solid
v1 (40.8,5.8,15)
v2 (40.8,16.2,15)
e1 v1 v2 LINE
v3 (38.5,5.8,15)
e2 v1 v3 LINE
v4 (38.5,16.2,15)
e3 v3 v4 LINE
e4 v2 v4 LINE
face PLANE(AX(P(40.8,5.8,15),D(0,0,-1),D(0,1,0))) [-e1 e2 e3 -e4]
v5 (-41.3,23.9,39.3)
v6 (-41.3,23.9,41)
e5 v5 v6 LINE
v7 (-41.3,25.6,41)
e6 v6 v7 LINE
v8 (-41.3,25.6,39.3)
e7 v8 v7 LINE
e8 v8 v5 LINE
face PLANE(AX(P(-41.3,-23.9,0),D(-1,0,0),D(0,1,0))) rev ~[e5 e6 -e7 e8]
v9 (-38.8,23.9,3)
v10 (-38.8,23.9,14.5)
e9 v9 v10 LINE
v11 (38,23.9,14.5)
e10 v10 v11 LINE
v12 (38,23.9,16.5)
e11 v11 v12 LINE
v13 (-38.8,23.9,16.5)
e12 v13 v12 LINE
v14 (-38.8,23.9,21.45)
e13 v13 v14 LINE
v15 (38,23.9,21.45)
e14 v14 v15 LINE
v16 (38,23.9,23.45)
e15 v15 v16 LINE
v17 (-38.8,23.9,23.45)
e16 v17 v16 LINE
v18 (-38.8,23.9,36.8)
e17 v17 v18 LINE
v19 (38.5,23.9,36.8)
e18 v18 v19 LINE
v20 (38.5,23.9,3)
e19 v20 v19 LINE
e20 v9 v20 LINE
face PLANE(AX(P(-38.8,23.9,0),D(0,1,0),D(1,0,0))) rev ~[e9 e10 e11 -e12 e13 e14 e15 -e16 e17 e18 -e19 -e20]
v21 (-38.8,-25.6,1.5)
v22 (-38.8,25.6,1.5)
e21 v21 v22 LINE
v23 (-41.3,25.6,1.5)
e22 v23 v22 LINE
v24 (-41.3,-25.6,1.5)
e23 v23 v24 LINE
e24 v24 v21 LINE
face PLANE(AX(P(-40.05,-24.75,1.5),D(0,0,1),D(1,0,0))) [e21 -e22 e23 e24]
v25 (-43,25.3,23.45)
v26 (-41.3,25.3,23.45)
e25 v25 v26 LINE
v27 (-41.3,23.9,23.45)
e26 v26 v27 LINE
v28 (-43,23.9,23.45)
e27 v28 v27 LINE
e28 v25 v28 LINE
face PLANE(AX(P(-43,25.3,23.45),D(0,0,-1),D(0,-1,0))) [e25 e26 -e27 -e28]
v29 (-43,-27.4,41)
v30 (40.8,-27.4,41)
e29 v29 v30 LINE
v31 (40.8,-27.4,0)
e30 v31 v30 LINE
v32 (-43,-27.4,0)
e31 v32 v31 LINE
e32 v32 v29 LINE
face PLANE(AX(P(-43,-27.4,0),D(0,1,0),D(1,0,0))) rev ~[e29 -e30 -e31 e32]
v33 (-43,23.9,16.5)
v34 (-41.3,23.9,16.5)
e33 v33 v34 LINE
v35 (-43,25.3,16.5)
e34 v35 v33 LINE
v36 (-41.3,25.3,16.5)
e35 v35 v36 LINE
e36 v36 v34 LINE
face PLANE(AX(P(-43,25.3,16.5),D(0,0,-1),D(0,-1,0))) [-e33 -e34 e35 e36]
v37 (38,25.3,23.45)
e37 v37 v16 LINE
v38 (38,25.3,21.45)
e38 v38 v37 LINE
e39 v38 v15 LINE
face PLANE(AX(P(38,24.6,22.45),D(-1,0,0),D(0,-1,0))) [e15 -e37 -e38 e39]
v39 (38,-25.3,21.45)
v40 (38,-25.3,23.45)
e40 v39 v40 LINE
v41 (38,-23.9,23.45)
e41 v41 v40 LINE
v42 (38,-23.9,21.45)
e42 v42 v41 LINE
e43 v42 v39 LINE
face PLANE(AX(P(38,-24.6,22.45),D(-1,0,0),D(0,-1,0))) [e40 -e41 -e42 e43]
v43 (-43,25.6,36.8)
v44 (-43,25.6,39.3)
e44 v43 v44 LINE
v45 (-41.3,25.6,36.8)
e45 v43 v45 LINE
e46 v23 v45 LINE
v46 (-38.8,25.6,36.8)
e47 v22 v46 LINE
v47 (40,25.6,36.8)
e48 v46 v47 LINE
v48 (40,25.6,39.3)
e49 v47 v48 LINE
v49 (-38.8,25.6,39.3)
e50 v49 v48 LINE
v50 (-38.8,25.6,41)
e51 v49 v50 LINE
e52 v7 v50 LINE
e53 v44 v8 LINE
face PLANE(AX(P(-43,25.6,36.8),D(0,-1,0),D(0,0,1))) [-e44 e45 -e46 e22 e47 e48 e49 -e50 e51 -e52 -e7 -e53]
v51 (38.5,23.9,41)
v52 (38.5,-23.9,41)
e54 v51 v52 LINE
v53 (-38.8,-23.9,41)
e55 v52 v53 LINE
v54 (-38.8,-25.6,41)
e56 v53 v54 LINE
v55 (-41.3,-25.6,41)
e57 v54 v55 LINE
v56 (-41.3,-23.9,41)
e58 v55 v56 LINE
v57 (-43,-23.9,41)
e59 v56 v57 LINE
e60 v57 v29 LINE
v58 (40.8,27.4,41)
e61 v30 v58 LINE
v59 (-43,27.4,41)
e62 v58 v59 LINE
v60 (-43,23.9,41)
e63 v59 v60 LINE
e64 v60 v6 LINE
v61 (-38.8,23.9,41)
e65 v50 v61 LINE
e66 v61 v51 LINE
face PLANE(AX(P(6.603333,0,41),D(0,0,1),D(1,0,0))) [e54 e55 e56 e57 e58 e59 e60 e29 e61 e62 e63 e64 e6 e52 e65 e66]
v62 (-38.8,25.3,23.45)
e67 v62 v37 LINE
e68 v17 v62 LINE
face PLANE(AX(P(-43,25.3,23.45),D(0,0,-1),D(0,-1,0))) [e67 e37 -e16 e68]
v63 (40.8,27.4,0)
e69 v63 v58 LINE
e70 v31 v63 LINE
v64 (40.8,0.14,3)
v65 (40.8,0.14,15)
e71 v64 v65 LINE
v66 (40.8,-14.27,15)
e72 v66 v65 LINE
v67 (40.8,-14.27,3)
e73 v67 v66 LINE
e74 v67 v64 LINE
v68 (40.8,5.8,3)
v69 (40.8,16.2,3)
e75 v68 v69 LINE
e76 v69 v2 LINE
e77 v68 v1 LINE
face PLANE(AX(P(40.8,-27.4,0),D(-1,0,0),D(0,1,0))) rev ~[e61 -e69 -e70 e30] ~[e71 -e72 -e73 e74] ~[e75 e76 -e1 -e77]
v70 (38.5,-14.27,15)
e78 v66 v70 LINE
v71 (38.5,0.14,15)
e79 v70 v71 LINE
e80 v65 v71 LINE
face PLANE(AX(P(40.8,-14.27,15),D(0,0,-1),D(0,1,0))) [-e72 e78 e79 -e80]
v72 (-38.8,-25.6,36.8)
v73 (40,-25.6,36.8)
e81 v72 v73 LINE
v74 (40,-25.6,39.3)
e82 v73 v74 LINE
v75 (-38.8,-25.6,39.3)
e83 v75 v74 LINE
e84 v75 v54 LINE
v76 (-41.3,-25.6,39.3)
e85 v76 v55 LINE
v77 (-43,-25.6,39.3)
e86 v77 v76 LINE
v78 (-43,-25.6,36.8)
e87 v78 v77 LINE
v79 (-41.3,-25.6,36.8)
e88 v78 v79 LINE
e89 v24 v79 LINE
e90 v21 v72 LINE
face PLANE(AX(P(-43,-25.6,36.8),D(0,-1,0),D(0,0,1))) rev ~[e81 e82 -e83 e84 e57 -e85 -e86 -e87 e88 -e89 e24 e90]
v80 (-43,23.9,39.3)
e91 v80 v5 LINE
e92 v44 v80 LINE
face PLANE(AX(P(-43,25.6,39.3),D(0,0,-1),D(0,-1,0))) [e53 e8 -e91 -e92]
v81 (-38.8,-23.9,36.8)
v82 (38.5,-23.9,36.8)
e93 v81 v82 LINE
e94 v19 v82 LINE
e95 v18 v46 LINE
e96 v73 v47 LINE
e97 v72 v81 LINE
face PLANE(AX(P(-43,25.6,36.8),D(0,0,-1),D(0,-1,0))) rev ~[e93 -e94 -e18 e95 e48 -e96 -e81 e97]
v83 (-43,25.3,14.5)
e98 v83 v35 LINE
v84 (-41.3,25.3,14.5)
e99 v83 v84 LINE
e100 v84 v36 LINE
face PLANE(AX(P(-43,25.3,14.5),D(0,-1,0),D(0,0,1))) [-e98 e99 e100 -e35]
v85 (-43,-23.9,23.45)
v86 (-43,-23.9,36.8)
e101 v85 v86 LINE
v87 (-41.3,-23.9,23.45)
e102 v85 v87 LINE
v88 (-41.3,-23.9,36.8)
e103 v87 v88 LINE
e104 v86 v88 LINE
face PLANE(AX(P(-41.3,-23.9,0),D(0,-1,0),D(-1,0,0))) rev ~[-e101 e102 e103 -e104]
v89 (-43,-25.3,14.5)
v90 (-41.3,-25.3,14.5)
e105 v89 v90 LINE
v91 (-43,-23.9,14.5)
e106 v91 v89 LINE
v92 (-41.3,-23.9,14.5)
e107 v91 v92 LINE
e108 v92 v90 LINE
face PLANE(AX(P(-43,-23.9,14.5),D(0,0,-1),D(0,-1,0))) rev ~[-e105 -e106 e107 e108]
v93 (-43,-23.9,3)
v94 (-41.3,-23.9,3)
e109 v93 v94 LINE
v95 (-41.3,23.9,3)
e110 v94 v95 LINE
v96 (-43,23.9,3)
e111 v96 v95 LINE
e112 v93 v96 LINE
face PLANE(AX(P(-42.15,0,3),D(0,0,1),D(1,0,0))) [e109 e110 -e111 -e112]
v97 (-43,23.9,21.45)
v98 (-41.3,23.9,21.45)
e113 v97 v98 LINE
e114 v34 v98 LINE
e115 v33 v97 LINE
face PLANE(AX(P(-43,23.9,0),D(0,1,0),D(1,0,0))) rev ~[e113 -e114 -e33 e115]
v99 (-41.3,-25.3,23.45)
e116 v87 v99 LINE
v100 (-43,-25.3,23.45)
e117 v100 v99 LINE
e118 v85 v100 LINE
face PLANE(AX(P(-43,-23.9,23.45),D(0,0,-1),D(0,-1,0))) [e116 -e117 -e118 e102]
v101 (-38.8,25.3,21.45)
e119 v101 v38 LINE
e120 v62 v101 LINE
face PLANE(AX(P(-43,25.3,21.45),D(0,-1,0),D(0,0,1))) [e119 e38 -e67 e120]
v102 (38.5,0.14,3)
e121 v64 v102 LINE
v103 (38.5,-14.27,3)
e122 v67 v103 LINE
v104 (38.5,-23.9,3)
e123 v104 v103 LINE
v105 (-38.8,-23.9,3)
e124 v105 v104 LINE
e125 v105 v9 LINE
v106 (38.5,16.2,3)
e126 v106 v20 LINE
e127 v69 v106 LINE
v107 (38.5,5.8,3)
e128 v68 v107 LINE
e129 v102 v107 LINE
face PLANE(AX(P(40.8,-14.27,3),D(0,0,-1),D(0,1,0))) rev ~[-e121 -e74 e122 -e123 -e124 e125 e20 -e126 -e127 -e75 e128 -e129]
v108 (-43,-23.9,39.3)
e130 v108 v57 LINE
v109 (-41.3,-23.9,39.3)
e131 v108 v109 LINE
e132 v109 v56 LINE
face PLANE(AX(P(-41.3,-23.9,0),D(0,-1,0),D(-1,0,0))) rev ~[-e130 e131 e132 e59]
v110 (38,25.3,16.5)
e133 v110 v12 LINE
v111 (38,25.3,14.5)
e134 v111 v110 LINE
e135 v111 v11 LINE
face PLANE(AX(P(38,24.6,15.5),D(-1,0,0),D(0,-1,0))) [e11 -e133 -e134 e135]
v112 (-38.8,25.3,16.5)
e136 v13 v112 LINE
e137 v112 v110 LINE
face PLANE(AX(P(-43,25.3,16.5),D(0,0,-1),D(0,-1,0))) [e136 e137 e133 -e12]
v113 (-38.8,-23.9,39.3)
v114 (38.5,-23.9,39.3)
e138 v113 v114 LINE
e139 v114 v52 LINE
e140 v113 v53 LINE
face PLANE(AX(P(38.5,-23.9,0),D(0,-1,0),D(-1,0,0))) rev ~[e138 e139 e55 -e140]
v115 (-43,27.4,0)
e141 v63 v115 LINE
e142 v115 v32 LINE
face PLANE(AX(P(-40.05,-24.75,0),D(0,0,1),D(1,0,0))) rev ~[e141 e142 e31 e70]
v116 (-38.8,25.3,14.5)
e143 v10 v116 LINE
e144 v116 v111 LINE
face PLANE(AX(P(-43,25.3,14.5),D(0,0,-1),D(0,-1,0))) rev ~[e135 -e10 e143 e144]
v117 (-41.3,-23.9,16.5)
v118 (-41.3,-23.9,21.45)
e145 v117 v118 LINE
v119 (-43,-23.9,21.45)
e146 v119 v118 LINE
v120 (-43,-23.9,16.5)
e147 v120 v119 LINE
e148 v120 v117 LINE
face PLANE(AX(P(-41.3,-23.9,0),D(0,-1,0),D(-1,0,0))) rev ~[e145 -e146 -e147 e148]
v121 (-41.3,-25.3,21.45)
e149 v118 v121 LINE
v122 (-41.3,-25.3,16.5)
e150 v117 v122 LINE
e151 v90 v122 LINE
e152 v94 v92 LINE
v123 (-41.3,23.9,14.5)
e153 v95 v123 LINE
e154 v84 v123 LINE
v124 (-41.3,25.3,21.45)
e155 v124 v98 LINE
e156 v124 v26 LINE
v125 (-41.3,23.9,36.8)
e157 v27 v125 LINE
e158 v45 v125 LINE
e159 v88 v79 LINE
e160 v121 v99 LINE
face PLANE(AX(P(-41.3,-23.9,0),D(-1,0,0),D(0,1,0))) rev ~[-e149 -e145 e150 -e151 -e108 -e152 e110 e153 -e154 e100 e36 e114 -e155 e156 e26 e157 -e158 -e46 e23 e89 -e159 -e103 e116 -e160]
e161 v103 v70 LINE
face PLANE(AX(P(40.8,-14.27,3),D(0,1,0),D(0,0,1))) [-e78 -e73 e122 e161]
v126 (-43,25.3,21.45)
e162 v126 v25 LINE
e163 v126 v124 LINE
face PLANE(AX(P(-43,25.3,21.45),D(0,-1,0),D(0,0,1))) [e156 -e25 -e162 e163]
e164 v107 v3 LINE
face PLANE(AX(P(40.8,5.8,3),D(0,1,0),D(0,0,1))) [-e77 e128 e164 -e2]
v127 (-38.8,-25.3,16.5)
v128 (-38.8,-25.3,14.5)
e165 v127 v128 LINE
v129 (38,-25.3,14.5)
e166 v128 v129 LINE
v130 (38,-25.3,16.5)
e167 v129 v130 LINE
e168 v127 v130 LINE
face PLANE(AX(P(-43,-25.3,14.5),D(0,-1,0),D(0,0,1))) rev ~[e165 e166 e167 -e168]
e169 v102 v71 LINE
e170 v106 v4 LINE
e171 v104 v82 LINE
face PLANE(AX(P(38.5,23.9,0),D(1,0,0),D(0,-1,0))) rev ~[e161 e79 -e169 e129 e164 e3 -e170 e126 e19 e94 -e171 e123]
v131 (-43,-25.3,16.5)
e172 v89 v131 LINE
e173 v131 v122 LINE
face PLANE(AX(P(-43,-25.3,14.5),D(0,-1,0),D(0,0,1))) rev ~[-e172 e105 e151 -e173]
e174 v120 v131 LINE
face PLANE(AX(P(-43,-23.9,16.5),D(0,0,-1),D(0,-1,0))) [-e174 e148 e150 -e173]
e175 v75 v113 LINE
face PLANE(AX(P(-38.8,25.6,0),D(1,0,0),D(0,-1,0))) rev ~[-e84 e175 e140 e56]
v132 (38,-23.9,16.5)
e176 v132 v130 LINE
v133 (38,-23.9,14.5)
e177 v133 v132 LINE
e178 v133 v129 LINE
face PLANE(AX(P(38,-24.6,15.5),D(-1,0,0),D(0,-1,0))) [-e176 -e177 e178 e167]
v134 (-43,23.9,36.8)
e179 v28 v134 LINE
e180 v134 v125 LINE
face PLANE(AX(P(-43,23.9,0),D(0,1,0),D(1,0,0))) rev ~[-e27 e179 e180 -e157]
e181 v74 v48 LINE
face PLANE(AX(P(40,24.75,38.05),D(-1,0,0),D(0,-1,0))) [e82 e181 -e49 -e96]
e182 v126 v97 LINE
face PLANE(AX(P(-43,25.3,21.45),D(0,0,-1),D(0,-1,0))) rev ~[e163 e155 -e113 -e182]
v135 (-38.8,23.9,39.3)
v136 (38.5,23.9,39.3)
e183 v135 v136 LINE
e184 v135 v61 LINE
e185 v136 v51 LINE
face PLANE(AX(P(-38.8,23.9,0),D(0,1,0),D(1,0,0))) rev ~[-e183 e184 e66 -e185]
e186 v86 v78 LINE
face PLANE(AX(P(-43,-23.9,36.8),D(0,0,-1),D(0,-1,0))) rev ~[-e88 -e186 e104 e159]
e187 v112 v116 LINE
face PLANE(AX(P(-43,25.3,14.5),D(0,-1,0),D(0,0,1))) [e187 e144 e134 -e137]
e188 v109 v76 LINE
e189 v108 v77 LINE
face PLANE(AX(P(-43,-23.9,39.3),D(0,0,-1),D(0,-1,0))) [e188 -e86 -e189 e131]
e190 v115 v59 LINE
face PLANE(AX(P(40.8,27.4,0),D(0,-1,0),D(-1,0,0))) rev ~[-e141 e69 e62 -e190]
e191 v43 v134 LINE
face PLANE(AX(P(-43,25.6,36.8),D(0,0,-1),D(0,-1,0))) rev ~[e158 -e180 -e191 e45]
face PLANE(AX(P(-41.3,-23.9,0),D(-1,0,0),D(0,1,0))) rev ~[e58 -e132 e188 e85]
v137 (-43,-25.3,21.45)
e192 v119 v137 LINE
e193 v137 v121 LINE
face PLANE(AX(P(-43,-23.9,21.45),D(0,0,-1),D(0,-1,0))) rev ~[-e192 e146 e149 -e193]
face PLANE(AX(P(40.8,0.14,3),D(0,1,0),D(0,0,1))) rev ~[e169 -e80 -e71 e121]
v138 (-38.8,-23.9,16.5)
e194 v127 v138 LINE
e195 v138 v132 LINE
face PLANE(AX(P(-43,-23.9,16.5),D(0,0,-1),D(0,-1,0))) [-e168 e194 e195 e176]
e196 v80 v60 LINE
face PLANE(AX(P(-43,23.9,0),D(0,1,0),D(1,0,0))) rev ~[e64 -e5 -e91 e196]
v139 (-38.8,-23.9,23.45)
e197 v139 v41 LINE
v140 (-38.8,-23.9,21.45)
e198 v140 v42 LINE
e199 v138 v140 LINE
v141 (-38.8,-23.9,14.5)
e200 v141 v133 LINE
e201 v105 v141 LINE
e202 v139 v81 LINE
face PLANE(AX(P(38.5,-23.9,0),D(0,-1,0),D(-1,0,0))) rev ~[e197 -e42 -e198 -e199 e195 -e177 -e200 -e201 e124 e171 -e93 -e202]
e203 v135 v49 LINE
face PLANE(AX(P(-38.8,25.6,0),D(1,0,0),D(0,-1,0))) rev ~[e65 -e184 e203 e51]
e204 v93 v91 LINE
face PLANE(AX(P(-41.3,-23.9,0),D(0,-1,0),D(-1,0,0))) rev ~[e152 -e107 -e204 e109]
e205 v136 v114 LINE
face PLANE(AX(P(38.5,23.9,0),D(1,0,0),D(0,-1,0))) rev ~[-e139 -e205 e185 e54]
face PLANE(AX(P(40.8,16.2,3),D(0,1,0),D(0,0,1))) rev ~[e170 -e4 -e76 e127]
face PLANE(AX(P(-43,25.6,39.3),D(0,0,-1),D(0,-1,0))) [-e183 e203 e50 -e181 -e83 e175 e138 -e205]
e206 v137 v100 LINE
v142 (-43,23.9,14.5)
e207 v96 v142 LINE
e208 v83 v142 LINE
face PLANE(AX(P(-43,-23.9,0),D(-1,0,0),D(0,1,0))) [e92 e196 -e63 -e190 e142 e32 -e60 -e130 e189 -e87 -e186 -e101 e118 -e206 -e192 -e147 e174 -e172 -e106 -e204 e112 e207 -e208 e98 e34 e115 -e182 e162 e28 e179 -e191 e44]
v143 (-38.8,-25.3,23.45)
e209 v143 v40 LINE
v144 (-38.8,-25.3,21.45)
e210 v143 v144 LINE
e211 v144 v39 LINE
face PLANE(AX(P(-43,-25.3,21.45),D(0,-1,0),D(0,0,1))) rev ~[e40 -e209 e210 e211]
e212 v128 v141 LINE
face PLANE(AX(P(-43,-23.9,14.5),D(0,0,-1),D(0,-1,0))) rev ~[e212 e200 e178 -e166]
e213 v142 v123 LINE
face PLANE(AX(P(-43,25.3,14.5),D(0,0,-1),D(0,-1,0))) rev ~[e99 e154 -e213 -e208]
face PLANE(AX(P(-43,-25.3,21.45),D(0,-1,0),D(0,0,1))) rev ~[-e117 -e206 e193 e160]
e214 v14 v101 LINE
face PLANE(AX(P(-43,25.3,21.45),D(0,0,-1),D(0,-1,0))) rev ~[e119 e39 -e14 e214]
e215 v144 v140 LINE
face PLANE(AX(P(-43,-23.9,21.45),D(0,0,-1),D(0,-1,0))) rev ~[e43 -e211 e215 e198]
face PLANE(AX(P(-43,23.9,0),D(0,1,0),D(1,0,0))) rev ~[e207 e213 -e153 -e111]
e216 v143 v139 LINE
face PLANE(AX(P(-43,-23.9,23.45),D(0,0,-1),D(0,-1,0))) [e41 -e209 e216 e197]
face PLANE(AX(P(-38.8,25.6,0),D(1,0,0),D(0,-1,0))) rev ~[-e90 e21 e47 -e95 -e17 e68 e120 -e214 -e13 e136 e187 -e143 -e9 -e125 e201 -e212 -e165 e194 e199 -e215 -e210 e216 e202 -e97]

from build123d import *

# Parameters (mm, degrees)
F2_DEPTH  = 41
F1_W      = 1.7
F1_H      = 47.8
F1_W_2    = 77.3
F3_DEPTH  = 3
F1_W_3    = 2.5
F1_H_2    = 1.7
F4_DEPTH  = 1.5
F5_W      = 14.41
F5_H      = 12
F5_W_2    = 10.4
F6_DEPTH  = 3
F7_W      = 1.4
F7_H      = 2
F8_DEPTH  = 81
F9_W      = 1.7
F9_H      = 2.5
F10_DEPTH = 83
F11_W     = 47.8
F11_H     = 2.5
F12_DEPTH = 1.5


with BuildPart() as f2:
    # F1 (on Top) → F2 (new body)
    with BuildSketch(Plane.XY):
        Polygon((-43, 27.4), (-43, 23.9), (-41.3, 23.9), (-41.3, 25.6), (-38.8, 25.6), (-38.8, 23.9), (38.5, 23.9), (38.5, -23.9), (-38.8, -23.9), (-38.8, -25.6), (-41.3, -25.6), (-41.3, -23.9), (-43, -23.9), (-43, -27.4), (40.8, -27.4), (40.8, 27.4), align=None)
    extrude(amount=F2_DEPTH)

    # F1 (on Top) → F3 (join)
    with BuildSketch(Plane.XY):
        with Locations((-42.15, 0)):
            Rectangle(F1_W, F1_H)
        with Locations((-0.15, 0)):
            Rectangle(F1_W_2, F1_H)
    extrude(amount=F3_DEPTH)

    # F1 (on Top) → F4 (join)
    with BuildSketch(Plane.XY):
        with Locations((-40.05, -24.75)):
            Rectangle(F1_W_3, F1_H_2)
        with Locations((-40.05, 0)):
            Rectangle(F1_W_3, F1_H)
        with Locations((-40.05, 24.75)):
            Rectangle(F1_W_3, F1_H_2)
    extrude(amount=F4_DEPTH)

    # F5 (on face) → F6 (cut)
    with BuildSketch(Plane.YZ.offset(40.8)):
        with Locations((-7.065, 9)):
            Rectangle(F5_W, F5_H)
        with Locations((11, 9)):
            Rectangle(F5_W_2, F5_H)
    extrude(amount=-F6_DEPTH, mode=Mode.SUBTRACT)

    # F7 (on face) → F8 (cut)
    with BuildSketch(Plane(origin=(-43, 0, 0), x_dir=(0, -1, 0), z_dir=(-1, 0, 0))):
        with Locations((-24.6, 15.5)):
            Rectangle(F7_W, F7_H)
        with Locations((-24.6, 22.45)):
            Rectangle(F7_W, F7_H)
        with Locations((24.6, 15.5)):
            Rectangle(F7_W, F7_H)
        with Locations((24.6, 22.45)):
            Rectangle(F7_W, F7_H)
    extrude(amount=-F8_DEPTH, mode=Mode.SUBTRACT)

    # F9 (on face) → F10 (cut)
    with BuildSketch(Plane(origin=(-43, 0, 0), x_dir=(0, -1, 0), z_dir=(-1, 0, 0))):
        with Locations((-24.75, 38.05)):
            Rectangle(F9_W, F9_H)
        with Locations((24.75, 38.05)):
            Rectangle(F9_W, F9_H)
    extrude(amount=-F10_DEPTH, mode=Mode.SUBTRACT)

    # F11 (on face) → F12 (cut)
    with BuildSketch(Plane(origin=(38.5, 0, 0), x_dir=(0, -1, 0), z_dir=(-1, 0, 0))):
        with Locations((0, 38.05)):
            Rectangle(F11_W, F11_H)
    extrude(amount=-F12_DEPTH, mode=Mode.SUBTRACT)


solid = f2.part
